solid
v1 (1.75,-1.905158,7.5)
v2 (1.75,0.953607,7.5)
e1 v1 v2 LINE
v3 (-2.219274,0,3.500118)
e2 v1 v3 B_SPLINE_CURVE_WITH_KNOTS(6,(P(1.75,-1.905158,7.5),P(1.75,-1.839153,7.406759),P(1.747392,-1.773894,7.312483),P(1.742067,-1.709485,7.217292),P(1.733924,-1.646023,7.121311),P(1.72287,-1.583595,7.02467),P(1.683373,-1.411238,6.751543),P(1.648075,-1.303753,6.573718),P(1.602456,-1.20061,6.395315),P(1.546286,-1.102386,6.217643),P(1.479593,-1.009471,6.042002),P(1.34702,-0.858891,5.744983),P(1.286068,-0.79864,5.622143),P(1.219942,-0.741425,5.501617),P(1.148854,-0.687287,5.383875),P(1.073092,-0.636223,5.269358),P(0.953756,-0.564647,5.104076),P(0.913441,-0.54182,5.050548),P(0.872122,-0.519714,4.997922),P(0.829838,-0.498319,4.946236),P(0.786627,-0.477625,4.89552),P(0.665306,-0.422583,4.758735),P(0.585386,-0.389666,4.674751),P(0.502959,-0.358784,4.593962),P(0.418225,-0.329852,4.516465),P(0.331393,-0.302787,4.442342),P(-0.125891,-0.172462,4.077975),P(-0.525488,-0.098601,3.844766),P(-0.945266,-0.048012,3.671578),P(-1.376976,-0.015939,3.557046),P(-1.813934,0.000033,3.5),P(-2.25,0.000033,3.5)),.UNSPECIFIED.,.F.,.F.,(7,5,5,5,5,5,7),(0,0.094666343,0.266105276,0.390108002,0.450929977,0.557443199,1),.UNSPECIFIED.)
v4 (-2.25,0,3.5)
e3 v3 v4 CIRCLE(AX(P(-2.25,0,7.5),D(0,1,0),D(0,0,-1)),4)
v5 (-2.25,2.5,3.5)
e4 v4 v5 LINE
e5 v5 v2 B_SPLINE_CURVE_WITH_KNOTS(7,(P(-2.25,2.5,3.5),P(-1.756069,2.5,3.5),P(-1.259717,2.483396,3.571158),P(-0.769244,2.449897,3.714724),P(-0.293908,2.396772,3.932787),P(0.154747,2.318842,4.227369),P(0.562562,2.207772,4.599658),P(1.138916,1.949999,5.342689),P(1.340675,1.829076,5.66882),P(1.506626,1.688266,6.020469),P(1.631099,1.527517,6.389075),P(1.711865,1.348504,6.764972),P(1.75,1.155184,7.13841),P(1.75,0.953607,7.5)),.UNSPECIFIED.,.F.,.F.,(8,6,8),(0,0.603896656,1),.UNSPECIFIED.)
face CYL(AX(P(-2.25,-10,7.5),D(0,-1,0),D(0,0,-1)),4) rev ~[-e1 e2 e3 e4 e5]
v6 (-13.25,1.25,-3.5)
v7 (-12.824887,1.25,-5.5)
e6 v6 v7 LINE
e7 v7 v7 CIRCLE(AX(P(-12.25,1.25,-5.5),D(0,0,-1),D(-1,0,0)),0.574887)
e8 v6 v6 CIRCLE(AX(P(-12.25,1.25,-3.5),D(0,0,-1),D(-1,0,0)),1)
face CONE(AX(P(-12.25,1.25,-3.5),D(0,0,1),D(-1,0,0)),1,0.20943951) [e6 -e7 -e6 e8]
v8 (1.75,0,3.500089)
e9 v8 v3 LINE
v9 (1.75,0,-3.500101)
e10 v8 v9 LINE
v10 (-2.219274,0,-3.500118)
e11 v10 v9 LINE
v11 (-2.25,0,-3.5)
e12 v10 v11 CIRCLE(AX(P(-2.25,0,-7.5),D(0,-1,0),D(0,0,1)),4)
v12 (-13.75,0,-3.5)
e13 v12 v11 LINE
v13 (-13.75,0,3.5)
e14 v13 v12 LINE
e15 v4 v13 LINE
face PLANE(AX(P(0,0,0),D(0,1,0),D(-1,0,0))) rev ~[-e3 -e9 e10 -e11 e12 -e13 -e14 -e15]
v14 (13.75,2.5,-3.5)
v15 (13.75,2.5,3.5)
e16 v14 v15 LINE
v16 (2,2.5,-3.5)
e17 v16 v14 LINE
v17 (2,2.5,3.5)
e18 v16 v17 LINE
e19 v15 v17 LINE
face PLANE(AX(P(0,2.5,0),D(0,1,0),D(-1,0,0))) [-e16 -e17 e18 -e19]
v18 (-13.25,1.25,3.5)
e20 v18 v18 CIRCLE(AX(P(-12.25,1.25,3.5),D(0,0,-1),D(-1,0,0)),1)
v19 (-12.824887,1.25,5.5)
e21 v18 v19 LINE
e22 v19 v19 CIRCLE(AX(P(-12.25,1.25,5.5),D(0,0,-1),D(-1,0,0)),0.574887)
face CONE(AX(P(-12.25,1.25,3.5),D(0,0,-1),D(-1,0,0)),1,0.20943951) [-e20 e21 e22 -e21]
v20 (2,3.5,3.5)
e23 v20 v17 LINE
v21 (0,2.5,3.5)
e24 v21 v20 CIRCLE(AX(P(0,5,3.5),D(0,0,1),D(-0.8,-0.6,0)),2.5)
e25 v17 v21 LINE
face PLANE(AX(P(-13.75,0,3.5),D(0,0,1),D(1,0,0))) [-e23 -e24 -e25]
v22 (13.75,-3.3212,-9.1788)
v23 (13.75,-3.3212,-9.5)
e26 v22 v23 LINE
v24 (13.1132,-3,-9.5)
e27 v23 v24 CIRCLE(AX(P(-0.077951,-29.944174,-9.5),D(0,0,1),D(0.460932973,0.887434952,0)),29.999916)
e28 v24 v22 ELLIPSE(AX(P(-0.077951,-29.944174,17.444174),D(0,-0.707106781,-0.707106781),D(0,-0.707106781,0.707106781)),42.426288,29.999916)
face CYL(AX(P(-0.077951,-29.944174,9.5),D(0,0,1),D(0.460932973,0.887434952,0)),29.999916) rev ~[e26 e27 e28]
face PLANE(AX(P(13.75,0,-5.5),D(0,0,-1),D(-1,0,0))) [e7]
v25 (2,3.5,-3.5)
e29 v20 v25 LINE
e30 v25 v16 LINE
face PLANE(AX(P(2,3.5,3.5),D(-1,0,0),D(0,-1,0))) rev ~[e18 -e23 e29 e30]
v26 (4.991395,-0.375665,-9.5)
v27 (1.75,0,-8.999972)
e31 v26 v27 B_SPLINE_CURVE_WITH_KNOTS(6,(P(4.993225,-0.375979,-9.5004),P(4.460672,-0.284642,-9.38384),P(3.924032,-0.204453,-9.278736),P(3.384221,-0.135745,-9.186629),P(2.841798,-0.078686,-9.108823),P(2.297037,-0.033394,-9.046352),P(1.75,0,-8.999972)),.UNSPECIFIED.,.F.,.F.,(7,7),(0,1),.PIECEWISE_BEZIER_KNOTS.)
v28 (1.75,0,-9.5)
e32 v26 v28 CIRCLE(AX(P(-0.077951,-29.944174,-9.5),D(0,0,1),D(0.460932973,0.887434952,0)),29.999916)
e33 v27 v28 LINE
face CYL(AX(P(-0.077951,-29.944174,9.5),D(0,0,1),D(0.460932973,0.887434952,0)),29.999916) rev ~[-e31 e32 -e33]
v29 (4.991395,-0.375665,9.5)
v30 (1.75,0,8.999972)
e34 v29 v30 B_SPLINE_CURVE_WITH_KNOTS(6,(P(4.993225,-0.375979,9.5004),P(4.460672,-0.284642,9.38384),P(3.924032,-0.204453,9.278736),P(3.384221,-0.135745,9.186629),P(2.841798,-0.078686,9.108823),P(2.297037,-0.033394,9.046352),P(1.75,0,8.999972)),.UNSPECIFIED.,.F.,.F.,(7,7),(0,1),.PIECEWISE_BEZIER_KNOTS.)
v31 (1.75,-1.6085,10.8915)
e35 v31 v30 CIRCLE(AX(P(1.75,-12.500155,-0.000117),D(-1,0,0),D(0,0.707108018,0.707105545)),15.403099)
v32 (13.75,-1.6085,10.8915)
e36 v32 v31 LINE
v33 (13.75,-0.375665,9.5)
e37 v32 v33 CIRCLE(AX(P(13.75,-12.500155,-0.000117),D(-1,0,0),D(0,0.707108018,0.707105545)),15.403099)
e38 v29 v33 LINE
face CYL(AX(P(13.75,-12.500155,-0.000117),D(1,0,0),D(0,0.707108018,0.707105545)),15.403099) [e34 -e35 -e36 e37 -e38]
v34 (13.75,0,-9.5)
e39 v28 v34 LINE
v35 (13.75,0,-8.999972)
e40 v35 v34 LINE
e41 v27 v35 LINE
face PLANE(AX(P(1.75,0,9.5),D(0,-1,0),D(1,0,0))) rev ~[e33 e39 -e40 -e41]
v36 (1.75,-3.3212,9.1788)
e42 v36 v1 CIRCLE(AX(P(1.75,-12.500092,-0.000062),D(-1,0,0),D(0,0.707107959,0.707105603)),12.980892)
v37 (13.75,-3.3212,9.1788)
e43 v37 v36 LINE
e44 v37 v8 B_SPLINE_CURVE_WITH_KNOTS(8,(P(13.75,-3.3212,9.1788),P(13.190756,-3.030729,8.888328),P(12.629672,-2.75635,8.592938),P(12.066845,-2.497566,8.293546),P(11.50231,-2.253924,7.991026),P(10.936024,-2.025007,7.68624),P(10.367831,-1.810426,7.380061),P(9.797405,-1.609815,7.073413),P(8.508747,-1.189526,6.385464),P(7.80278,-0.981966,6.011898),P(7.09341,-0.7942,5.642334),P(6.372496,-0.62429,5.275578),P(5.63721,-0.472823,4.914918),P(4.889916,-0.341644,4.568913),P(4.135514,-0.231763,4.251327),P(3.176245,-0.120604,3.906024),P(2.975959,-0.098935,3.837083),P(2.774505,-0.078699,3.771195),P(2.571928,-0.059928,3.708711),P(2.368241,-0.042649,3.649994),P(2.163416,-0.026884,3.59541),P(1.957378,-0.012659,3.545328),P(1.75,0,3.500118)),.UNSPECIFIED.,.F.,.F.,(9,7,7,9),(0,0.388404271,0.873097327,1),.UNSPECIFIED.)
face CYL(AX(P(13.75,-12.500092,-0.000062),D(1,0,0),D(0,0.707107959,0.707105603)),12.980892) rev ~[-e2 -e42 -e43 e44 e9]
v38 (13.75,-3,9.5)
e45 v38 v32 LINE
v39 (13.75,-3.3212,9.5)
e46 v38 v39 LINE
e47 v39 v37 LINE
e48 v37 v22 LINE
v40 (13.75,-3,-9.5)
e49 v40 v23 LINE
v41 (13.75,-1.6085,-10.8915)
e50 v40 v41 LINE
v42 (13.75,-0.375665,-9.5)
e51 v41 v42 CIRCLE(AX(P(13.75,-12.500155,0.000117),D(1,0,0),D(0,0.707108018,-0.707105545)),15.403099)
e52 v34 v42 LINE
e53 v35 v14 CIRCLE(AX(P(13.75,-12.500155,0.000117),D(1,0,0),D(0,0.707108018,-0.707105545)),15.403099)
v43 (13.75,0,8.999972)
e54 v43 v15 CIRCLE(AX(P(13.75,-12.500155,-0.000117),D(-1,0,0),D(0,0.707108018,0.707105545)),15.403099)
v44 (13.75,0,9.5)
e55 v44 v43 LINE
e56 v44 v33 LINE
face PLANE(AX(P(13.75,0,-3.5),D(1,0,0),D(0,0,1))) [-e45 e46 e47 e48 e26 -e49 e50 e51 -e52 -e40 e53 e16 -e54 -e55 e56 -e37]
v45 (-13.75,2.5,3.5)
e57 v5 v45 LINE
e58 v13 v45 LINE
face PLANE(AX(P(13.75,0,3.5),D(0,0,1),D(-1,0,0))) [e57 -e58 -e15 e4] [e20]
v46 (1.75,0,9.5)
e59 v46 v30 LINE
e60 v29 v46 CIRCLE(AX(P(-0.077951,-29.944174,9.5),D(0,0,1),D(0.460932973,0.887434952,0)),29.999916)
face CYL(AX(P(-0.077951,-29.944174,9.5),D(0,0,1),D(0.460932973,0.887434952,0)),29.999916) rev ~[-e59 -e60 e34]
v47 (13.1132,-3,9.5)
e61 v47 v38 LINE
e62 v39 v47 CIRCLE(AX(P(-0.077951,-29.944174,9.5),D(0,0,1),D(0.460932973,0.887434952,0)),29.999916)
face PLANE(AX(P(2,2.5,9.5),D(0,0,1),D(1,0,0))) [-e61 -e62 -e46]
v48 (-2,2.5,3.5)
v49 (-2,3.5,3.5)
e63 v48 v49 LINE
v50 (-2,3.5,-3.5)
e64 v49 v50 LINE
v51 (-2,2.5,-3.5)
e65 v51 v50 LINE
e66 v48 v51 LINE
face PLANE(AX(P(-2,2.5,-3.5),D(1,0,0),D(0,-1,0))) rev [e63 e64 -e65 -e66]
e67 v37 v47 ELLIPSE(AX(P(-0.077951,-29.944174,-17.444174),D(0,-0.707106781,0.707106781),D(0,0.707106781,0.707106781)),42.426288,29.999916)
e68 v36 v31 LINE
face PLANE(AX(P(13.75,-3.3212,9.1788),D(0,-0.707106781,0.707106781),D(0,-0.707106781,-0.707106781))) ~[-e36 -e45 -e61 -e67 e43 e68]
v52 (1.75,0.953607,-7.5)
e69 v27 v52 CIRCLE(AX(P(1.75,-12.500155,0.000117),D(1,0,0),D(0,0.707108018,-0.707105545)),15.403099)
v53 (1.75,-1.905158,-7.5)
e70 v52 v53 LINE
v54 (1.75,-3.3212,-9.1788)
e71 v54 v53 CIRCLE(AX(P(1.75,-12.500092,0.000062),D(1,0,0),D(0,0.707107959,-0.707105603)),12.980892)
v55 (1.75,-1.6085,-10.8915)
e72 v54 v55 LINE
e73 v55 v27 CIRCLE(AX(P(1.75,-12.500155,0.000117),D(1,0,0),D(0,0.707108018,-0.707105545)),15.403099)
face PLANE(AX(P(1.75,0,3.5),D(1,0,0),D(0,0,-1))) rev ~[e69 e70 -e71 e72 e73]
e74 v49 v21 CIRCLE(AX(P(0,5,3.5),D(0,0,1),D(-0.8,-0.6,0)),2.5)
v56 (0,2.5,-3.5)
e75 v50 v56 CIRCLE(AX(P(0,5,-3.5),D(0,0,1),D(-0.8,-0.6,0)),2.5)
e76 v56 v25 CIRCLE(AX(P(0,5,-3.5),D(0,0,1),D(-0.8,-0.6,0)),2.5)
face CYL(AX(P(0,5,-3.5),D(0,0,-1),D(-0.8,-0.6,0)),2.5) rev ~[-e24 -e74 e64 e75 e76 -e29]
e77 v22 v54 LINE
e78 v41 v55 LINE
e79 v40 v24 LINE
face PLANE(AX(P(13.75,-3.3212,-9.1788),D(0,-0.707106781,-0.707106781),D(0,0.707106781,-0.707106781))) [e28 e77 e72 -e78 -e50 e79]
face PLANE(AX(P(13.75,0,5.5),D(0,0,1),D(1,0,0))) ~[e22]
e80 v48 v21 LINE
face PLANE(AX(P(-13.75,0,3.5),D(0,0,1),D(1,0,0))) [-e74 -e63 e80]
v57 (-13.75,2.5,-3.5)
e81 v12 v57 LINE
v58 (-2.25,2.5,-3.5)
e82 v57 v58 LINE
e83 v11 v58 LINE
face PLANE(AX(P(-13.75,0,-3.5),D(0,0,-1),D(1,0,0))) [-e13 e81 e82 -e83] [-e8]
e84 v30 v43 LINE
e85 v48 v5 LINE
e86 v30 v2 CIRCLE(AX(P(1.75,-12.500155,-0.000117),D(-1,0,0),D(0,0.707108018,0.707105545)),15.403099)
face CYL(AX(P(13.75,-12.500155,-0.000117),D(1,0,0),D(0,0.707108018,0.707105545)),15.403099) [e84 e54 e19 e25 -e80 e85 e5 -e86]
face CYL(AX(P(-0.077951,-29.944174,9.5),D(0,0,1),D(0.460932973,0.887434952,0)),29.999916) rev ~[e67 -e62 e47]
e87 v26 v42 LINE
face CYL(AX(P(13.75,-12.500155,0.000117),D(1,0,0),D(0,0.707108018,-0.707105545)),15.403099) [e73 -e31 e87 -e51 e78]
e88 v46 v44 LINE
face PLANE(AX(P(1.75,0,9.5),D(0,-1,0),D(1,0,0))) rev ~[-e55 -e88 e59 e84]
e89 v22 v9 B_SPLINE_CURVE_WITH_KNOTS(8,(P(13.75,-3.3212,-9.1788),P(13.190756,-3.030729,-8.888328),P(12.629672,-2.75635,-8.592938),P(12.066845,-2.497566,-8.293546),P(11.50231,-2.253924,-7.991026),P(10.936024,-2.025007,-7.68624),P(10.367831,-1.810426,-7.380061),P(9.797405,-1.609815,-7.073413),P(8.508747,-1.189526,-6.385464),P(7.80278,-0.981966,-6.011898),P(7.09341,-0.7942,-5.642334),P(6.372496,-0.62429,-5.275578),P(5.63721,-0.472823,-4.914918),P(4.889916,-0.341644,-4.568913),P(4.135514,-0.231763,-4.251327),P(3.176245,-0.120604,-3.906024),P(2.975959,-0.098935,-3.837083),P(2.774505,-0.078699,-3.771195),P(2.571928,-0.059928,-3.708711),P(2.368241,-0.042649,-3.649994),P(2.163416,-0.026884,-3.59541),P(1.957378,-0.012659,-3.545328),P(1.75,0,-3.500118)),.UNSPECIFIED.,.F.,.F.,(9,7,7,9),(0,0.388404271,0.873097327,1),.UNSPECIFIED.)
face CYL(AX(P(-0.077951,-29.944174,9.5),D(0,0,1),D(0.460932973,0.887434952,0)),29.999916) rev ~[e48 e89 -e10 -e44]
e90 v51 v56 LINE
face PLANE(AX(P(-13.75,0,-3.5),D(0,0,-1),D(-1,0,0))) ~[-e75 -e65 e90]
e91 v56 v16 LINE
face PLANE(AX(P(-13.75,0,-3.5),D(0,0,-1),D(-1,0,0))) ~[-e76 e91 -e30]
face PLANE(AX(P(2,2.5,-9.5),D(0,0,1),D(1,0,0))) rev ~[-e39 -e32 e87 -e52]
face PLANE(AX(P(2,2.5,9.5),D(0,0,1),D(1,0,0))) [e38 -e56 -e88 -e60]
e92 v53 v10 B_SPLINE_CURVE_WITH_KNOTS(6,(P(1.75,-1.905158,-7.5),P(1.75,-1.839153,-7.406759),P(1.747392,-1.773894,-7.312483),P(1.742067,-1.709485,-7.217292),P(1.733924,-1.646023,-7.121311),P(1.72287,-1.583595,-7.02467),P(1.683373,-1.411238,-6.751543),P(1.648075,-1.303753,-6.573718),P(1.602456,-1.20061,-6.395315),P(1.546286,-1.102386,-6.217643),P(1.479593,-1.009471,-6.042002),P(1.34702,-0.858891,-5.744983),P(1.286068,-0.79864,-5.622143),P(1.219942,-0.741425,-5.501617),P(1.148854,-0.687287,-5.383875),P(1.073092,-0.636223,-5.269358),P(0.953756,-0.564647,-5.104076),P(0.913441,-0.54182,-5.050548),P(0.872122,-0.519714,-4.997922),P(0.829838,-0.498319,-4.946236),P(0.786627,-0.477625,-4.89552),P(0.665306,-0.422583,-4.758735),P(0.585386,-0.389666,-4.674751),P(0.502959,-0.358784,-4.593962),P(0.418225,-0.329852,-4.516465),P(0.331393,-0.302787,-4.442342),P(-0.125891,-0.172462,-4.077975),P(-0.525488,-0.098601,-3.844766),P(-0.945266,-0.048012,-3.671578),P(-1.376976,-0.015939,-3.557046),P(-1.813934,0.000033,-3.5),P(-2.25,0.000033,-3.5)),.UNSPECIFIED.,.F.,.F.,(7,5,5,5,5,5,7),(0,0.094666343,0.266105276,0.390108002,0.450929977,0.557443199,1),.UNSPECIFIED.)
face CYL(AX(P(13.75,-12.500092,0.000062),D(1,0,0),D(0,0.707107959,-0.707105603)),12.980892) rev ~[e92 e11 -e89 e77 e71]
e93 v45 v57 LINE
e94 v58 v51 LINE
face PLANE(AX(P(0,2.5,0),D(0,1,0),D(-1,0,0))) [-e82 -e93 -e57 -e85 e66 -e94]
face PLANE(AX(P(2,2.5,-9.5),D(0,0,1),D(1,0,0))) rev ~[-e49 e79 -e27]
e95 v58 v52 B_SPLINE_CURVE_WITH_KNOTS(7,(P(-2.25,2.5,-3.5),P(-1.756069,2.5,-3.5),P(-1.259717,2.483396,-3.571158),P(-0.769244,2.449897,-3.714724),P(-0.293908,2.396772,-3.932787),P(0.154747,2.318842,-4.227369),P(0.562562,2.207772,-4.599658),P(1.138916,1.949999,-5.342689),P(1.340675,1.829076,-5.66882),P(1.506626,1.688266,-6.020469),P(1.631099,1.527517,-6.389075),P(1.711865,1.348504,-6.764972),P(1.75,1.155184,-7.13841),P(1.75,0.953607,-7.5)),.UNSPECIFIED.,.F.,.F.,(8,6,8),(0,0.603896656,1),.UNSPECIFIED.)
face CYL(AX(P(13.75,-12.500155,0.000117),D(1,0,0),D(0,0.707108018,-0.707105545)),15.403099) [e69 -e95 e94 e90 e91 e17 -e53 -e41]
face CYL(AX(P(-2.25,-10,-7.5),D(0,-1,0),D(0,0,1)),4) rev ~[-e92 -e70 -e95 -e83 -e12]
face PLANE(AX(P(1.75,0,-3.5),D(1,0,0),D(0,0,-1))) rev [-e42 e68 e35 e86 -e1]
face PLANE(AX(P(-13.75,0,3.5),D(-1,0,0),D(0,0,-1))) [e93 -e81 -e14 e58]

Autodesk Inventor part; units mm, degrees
ref_plane "YZ Plane" through (0, 0, 0) normal (1, 0, 0) x (0, 1, 0)
ref_plane "XZ Plane" through (0, 0, 0) normal (0, 1, 0) x (-1, 0, 0)
ref_plane "XY Plane" through (0, 0, 0) normal (0, 0, 1) x (1, 0, 0)
sketch "Sketch1" plane through (0, 0, 0) normal (0, 1, 0) x (-1, 0, 0)
  line L0 (-13.75, 3.5) -> (13.75, 3.5)
  line L1 (13.75, 3.5) -> (13.75, -3.5)
  line L2 (13.75, -3.5) -> (-13.75, -3.5)
  line L3 (-13.75, -3.5) -> (-13.75, 3.5)
  line L4 (-13.75, 3.5) -> (13.75, -3.5) construction
  line L5 (13.75, 3.5) -> (-13.75, -3.5) construction
  point P0 (0, 0)
  dimension "d0" = 27.5
  dimension "d1" = 7
extrude "Extrusion1" add sketch "Sketch1" along normal blind 2.5
sketch "Sketch2" plane through (13.75, 0, -3.5) normal (0, 0, -1) x (-1, 0, 0)
  line L0 (27.5, 0) -> (27.5, 2.5) projected
  line L1 (27.5, 1.25) -> (26, 1.25)
  circle A0 centre (26, 1.25) radius 1
  point P0 (13.75, 0)
  dimension "d4" = 1.5
  dimension "d5" = 2
extrude "Extrusion2" add sketch "Sketch2" along normal blind 2 draft -12
sketch "Sketch3" plane through (13.75, 0, 3.5) normal (1, 0, 0) x (0, 0, -1)
  line L0 (0, 2.5) -> (7, 2.5) projected
  line L1 (3.5, 2.5) -> (3.5, -12.5)
  line L2 (7, 0) -> (7, 2.5) projected
  arc A0 (14.3915, -1.6085) -> (7, 2.5) centre (3.5, -12.5) ccw
  arc A1 (12.6788, -3.3212) -> (3.5, 0.4808) centre (3.5, -12.5) ccw
  line L3 (3.5, -12.5) -> (14.3915, -1.6085)
  line L4 (3.5, -12.5) -> (18.9029, -12.5) construction
  line L5 (7, 0) -> (7, 2.5)
  point P0 (3.5, 0)
  dimension "d8" = 15
  dimension "d9" = 45
extrude "Extrusion3" add sketch "Sketch3" against normal blind 12 contours L0 L2 A1 L1 | A0 L3 A1 L2
sketch "Sketch4" plane through (-13.75, 0, 3.5) normal (0, 0, 1) x (1, 0, 0)
  line L0 (0, 2.5) -> (27.5, 2.5) projected
  line L1 (13.75, 2.5) -> (15.75, 2.5)
  line L2 (15.75, 2.5) -> (11.75, 2.5)
  line L3 (11.75, 2.5) -> (11.75, 3.5)
  line L4 (11.75, 3.5) -> (15.75, 3.5)
  line L5 (15.75, 3.5) -> (15.75, 2.5)
  arc A0 (11.75, 3.5) -> (15.75, 3.5) centre (13.75, 5) ccw
  point P0 (13.75, 0)
  dimension "d12" = 2
  dimension "d13" = 4
  dimension "d14" = 1
extrude "Extrusion4" add sketch "Sketch4" against normal blind 3.5 contours L3 A0 L0 | A0 L5 L0
fillet "Fillet1" radius 4 1 edges at (1.75, 1.25, -3.5)
mirror "Mirror1" about plane through (1.2398, 2.7314, 0) normal (0, 0, -1)
ref_plane "Work Plane1" through (2, 2.5, 9.5) normal (0, 0, 1) x (1, 0, 0)
sketch "Sketch6" plane through (2, 2.5, 9.5) normal (0, 0, 1) x (1, 0, 0)
  line L0 (11.75, -2.5) -> (11.75, -5.8212) projected
  line L1 (11.75, -5.8894) -> (11.75, -2.5)
  line L2 (-4.25, -2.5) -> (11.75, -2.5) projected
  line L3 (11.75, -2.5) -> (-0.25, -2.5)
  arc A0 (11.75, -5.8212) -> (-0.25, -2.5) centre (-2.078, -32.4443) ccw
  point P0 (-2, -2.5)
  dimension "d25" = 12
  dimension "d26" = 30
extrude "Extrusion6" add sketch "Sketch6" against normal blind 19
properties part number "index_clamp"
